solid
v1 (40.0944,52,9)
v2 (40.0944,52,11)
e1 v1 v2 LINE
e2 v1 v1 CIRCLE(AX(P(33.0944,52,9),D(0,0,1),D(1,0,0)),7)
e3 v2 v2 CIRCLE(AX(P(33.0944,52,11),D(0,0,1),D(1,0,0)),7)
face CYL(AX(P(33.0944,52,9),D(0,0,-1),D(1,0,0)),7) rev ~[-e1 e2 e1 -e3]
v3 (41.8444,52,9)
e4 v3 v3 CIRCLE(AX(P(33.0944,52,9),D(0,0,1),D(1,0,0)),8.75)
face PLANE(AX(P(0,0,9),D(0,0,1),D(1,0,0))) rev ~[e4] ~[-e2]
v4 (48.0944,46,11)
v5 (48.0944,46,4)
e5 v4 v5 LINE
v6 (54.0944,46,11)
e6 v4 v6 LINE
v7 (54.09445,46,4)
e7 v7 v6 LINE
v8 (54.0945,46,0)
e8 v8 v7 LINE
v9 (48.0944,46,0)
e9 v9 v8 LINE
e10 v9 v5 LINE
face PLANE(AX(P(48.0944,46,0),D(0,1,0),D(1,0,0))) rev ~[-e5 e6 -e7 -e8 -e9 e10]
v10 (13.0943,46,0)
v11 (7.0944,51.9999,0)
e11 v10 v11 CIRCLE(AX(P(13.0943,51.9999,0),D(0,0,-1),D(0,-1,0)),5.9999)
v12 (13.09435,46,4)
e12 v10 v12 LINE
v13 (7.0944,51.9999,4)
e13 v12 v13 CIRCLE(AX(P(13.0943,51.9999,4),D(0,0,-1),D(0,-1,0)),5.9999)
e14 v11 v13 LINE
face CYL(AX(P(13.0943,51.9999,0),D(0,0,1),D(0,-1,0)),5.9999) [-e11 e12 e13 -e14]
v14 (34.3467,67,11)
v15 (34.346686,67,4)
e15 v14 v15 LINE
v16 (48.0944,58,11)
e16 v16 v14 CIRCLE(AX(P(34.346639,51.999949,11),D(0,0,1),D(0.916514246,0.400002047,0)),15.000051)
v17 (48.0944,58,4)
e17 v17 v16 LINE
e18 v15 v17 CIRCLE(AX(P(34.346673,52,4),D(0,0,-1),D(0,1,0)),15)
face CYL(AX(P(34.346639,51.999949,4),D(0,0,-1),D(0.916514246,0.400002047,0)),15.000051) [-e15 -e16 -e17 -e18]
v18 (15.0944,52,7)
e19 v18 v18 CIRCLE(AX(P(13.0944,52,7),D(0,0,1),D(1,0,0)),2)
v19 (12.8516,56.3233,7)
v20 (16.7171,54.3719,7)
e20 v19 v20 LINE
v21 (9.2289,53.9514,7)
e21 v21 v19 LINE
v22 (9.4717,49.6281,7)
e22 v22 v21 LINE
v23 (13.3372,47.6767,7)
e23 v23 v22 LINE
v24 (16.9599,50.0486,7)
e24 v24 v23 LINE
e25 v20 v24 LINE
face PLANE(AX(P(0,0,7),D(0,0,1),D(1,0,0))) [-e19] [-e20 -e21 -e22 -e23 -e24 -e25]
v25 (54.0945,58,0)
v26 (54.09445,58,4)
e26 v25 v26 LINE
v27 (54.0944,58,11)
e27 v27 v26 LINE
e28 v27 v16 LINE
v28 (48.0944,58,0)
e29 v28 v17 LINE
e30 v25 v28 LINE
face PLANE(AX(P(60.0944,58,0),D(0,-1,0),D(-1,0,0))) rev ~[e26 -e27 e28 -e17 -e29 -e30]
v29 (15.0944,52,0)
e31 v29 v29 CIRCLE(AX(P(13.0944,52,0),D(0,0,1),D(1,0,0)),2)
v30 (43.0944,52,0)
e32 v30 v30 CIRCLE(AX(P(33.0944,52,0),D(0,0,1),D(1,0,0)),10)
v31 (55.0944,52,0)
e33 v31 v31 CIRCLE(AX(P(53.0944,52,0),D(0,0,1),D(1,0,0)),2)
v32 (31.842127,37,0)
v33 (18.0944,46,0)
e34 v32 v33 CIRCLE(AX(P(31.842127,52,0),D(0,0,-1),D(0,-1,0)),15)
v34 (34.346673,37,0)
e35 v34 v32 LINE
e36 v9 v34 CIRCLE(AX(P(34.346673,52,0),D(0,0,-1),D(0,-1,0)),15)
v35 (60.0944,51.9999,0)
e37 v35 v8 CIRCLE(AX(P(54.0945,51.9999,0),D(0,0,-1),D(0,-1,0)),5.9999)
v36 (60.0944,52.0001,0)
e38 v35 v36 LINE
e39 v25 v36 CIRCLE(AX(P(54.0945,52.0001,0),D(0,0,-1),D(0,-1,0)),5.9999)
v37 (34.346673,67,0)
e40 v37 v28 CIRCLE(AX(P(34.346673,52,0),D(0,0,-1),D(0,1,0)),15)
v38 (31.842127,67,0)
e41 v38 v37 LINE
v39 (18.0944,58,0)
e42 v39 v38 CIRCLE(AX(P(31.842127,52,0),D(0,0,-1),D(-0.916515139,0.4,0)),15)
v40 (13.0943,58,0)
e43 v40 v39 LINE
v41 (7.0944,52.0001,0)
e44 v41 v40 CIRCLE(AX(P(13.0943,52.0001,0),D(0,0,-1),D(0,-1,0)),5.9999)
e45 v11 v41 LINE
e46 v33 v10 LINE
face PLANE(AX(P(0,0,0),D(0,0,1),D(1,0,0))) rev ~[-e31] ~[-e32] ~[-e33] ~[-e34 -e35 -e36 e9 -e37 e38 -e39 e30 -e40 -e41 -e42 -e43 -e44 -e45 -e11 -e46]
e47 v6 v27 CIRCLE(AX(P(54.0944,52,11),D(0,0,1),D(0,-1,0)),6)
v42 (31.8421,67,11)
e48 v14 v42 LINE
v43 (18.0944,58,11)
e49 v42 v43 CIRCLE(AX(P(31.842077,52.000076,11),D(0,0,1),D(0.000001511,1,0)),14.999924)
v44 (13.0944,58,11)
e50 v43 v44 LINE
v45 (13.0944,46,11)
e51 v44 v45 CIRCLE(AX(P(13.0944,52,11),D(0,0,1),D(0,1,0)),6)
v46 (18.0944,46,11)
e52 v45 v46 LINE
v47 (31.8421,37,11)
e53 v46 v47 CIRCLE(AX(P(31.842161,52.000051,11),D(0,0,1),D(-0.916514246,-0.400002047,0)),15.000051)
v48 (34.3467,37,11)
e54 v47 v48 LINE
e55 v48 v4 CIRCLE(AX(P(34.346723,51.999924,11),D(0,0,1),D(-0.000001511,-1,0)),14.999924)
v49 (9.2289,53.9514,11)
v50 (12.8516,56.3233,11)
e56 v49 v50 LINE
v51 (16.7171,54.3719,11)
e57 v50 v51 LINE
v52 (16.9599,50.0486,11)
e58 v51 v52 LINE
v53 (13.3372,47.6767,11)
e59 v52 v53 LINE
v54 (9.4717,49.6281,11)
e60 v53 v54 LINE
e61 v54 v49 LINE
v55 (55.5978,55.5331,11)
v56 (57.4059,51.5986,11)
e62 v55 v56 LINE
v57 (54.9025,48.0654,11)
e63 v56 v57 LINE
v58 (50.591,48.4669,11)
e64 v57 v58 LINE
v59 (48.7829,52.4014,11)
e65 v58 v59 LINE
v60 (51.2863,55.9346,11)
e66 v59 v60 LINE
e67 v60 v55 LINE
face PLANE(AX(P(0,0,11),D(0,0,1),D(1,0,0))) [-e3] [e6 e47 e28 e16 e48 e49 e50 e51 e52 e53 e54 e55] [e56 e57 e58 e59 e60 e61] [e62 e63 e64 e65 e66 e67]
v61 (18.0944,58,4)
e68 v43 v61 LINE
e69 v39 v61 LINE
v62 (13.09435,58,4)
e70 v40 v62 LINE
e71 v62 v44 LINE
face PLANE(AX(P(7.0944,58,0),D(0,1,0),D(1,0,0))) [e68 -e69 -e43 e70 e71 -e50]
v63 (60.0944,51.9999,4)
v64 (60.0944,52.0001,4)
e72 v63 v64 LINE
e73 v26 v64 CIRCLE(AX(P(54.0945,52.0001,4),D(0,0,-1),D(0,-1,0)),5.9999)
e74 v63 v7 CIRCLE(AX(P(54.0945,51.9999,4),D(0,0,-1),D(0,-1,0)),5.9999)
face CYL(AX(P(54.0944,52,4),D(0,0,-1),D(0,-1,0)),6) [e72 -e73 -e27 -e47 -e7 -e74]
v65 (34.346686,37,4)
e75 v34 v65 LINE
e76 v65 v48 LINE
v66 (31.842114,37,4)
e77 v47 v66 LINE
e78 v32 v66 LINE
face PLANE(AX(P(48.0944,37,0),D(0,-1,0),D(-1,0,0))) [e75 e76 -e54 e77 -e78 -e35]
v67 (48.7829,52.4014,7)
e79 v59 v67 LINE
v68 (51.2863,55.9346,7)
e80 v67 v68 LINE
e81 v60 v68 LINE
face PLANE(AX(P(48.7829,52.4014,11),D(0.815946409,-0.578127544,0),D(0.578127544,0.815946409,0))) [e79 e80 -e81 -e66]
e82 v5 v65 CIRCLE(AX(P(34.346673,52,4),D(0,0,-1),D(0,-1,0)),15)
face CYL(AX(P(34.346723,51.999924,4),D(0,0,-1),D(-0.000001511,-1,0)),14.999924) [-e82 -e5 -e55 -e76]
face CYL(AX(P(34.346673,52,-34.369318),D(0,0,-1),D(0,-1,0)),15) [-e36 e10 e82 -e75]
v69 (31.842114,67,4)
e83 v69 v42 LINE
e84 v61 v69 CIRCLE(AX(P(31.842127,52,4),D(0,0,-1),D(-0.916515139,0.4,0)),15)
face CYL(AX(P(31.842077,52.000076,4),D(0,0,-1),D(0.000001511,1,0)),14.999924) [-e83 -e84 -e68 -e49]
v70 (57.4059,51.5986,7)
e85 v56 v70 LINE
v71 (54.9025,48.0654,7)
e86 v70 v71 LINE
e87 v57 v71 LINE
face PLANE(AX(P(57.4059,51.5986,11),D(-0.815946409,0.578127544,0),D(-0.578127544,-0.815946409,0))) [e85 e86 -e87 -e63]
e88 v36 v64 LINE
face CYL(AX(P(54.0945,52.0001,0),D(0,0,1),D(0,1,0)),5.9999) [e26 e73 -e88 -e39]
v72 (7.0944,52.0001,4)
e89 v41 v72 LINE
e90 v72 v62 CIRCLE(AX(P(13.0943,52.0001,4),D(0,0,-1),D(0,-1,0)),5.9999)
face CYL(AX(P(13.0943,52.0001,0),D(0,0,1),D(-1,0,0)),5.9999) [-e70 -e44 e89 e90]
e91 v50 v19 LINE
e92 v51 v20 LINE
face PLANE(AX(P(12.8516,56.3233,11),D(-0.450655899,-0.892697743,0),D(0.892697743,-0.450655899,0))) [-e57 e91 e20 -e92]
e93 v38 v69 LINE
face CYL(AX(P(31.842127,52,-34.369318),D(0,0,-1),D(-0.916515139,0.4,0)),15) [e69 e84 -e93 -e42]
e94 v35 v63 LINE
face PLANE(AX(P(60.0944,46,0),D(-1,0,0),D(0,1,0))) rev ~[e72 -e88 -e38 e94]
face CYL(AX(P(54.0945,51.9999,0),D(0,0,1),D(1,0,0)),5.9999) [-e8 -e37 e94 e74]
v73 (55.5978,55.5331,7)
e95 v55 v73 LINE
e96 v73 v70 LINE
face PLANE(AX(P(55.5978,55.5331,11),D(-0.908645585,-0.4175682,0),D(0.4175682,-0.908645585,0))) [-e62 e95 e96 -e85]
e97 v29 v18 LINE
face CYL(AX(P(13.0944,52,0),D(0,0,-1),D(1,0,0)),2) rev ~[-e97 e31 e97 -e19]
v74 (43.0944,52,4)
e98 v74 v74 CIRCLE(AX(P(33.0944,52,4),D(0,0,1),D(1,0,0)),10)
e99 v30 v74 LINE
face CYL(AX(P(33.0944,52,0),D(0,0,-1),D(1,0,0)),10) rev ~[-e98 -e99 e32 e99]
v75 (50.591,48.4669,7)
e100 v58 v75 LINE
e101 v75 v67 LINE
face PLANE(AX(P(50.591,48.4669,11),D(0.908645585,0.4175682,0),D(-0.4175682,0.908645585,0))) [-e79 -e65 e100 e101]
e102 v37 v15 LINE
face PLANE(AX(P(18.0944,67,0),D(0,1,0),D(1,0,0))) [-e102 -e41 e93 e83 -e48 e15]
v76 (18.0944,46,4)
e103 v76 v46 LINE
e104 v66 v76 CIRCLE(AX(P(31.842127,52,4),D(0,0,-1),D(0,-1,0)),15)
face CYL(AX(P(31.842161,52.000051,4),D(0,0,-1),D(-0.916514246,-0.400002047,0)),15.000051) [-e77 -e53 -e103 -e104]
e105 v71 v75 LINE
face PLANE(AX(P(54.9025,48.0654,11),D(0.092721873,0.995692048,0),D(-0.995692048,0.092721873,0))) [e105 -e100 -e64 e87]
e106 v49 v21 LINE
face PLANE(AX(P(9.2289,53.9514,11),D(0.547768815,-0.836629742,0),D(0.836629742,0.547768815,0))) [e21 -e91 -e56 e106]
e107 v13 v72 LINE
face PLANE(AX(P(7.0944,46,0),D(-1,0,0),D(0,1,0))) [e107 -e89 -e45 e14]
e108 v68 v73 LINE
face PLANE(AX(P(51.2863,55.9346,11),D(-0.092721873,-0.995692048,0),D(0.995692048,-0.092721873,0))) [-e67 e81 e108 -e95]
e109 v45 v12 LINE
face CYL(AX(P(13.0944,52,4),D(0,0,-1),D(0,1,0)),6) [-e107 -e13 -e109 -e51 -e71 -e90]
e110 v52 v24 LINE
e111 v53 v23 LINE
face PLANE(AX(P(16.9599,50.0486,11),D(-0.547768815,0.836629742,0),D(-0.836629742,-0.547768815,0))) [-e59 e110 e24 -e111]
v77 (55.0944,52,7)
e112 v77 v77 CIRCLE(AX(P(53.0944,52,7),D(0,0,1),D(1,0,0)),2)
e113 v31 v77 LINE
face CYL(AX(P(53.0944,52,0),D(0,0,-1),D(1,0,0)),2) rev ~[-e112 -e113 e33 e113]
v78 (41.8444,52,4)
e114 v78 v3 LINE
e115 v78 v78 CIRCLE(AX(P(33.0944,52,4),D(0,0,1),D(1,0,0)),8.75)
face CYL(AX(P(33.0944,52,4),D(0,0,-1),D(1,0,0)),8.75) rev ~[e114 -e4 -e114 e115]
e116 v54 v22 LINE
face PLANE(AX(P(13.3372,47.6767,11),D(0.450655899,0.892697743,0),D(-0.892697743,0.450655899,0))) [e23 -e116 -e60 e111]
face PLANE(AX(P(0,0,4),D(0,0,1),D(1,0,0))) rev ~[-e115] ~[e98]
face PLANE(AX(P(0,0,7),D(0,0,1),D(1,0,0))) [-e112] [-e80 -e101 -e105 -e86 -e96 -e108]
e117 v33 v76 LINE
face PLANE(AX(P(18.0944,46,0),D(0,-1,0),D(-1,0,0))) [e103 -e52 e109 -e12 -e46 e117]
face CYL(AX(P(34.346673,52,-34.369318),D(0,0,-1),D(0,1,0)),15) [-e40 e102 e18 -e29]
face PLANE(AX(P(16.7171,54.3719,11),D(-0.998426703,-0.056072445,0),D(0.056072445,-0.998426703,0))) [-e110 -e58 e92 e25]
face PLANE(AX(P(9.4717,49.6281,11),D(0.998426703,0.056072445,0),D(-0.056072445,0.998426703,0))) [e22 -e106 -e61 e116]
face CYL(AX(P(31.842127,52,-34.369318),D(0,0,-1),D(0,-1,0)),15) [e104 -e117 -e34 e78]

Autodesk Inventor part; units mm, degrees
ref_plane "YZ Plane" through (0, 0, 0) normal (1, 0, 0) x (0, 1, 0)
ref_plane "XZ Plane" through (0, 0, 0) normal (0, 1, 0) x (-1, 0, 0)
ref_plane "XY Plane" through (0, 0, 0) normal (0, 0, 1) x (1, 0, 0)
sketch "Эскиз1" plane through (0, 0, 0) normal (0, 0, 1) x (1, 0, 0)
  circle A0 centre (33.0944, 52) radius 10 projected
  circle A1 centre (53.0944, 52) radius 2 projected
  circle A2 centre (13.0944, 52) radius 2 projected
  line L0 (48.0944, 37) -> (18.0944, 37)
  line L1 (18.0944, 37) -> (18.0944, 67)
  line L2 (18.0944, 67) -> (48.0944, 67)
  line L3 (48.0944, 67) -> (48.0944, 37)
  line L4 (18.0944, 46) -> (7.0944, 46)
  line L5 (7.0944, 46) -> (7.0944, 58)
  line L6 (7.0944, 58) -> (18.0944, 58)
  line L7 (18.0944, 58) -> (18.0944, 46)
  line L8 (48.0944, 46) -> (60.0944, 46)
  line L9 (60.0944, 46) -> (60.0944, 58)
  line L10 (60.0944, 58) -> (48.0944, 58)
  line L11 (48.0944, 58) -> (48.0944, 46)
  point P0 (0, 0)
  dimension "d0" = 15
  dimension "d1" = 15
  dimension "d2" = 15
  dimension "d3" = 15
  dimension "d4" = 6
  dimension "d5" = 6
  dimension "d6" = 6
  dimension "d7" = 12
  dimension "d8" = 12
extrude "Выдавливание1" add sketch "Эскиз1" along normal blind 4
fillet "Сопряжение1" radius 15 4 edges at (18.0944, 37, 2) (18.0944, 67, 2) (48.0944, 37, 2) (48.0944, 67, 2)
fillet "Сопряжение2" radius 6 4 edges at (60.0944, 58, 2) (60.0944, 46, 2) (7.0944, 46, 2) (7.0944, 58, 2)
sketch "Эскиз2" plane through (0, 0, 4) normal (0, 0, 1) x (1, 0, 0)
  circle A0 centre (33.0944, 52) radius 10 projected
  circle A1 centre (33.0944, 52) radius 8.75
  circle A2 centre (33.0944, 52) radius 10 projected
  circle A3 centre (53.0944, 52) radius 2 projected
  circle A4 centre (13.0944, 52) radius 2 projected
  arc A5 (13.0944, 58) -> (13.0944, 46) centre (13.0944, 52) ccw projected
  line L0 (13.0944, 46) -> (18.0944, 46) projected
  arc A6 (18.0944, 46) -> (31.8421, 37) centre (31.8421, 52) ccw projected
  line L1 (31.8421, 37) -> (34.3467, 37) projected
  arc A7 (34.3467, 37) -> (48.0944, 46) centre (34.3467, 52) ccw projected
  line L2 (48.0944, 46) -> (54.0944, 46) projected
  arc A8 (54.0944, 46) -> (54.0944, 58) centre (54.0944, 52) ccw projected
  line L3 (54.0944, 58) -> (48.0944, 58) projected
  arc A9 (48.0944, 58) -> (34.3467, 67) centre (34.3467, 52) ccw projected
  line L4 (34.3467, 67) -> (31.8421, 67) projected
  arc A10 (31.8421, 67) -> (18.0944, 58) centre (31.8421, 52) ccw projected
  line L5 (18.0944, 58) -> (13.0944, 58) projected
  point P0 (0, 0)
  dimension "d13" = 17.5
extrude "Выдавливание2" add sketch "Эскиз2" along normal blind 5 contours A0 | L5 A10 L4 A9 L3 A8 L2 A7 L1 A6 L0 A5
sketch "Эскиз3" plane through (0, 0, 9) normal (0, 0, 1) x (1, 0, 0)
  circle A0 centre (33.0944, 52) radius 8.75 projected
  circle A1 centre (13.0944, 52) radius 2 projected
  circle A2 centre (53.0944, 52) radius 2 projected
  arc A3 (13.0944, 58) -> (13.0944, 46) centre (13.0944, 52) ccw projected
  line L0 (13.0944, 46) -> (18.0944, 46) projected
  arc A4 (18.0944, 46) -> (31.8421, 37) centre (31.8421, 52) ccw projected
  line L1 (31.8421, 37) -> (34.3467, 37) projected
  arc A5 (34.3467, 37) -> (48.0944, 46) centre (34.3467, 52) ccw projected
  line L2 (48.0944, 46) -> (54.0944, 46) projected
  arc A6 (54.0944, 46) -> (54.0944, 58) centre (54.0944, 52) ccw projected
  line L3 (54.0944, 58) -> (48.0944, 58) projected
  arc A7 (48.0944, 58) -> (34.3467, 67) centre (34.3467, 52) ccw projected
  line L4 (34.3467, 67) -> (31.8421, 67) projected
  arc A8 (31.8421, 67) -> (18.0944, 58) centre (31.8421, 52) ccw projected
  line L5 (18.0944, 58) -> (13.0944, 58) projected
  circle A9 centre (33.0944, 52) radius 7
  point P0 (0, 0)
  dimension "d16" = 14
extrude "Выдавливание3" add sketch "Эскиз3" along normal blind 2 contours A0 | L5 A8 L4 A7 L3 A6 L2 A5 L1 A4 L0 A3
sketch "Эскиз4" plane through (0, 0, 11) normal (0, 0, 1) x (1, 0, 0)
  circle A0 centre (13.0944, 52) radius 2 projected
  circle A1 centre (53.0944, 52) radius 2 projected
  line L0 (9.4717, 49.6281) -> (9.2289, 53.9514)
  line L1 (9.2289, 53.9514) -> (12.8516, 56.3233)
  line L2 (12.8516, 56.3233) -> (16.7171, 54.3719)
  line L3 (16.7171, 54.3719) -> (16.9599, 50.0486)
  line L4 (16.9599, 50.0486) -> (13.3372, 47.6767)
  line L5 (13.3372, 47.6767) -> (9.4717, 49.6281)
  line L6 (50.591, 48.4669) -> (48.7829, 52.4014)
  line L7 (48.7829, 52.4014) -> (51.2863, 55.9346)
  line L8 (51.2863, 55.9346) -> (55.5978, 55.5331)
  line L9 (55.5978, 55.5331) -> (57.4059, 51.5986)
  line L10 (57.4059, 51.5986) -> (54.9025, 48.0654)
  line L11 (54.9025, 48.0654) -> (50.591, 48.4669)
  point P0 (0, 0)
  dimension "d19" = 7.5
  dimension "d20" = 7.5
extrude "Выдавливание4" cut sketch "Эскиз4" against normal blind 4
equation "\"d20\" = d19"
properties part number "ппрофиль"
